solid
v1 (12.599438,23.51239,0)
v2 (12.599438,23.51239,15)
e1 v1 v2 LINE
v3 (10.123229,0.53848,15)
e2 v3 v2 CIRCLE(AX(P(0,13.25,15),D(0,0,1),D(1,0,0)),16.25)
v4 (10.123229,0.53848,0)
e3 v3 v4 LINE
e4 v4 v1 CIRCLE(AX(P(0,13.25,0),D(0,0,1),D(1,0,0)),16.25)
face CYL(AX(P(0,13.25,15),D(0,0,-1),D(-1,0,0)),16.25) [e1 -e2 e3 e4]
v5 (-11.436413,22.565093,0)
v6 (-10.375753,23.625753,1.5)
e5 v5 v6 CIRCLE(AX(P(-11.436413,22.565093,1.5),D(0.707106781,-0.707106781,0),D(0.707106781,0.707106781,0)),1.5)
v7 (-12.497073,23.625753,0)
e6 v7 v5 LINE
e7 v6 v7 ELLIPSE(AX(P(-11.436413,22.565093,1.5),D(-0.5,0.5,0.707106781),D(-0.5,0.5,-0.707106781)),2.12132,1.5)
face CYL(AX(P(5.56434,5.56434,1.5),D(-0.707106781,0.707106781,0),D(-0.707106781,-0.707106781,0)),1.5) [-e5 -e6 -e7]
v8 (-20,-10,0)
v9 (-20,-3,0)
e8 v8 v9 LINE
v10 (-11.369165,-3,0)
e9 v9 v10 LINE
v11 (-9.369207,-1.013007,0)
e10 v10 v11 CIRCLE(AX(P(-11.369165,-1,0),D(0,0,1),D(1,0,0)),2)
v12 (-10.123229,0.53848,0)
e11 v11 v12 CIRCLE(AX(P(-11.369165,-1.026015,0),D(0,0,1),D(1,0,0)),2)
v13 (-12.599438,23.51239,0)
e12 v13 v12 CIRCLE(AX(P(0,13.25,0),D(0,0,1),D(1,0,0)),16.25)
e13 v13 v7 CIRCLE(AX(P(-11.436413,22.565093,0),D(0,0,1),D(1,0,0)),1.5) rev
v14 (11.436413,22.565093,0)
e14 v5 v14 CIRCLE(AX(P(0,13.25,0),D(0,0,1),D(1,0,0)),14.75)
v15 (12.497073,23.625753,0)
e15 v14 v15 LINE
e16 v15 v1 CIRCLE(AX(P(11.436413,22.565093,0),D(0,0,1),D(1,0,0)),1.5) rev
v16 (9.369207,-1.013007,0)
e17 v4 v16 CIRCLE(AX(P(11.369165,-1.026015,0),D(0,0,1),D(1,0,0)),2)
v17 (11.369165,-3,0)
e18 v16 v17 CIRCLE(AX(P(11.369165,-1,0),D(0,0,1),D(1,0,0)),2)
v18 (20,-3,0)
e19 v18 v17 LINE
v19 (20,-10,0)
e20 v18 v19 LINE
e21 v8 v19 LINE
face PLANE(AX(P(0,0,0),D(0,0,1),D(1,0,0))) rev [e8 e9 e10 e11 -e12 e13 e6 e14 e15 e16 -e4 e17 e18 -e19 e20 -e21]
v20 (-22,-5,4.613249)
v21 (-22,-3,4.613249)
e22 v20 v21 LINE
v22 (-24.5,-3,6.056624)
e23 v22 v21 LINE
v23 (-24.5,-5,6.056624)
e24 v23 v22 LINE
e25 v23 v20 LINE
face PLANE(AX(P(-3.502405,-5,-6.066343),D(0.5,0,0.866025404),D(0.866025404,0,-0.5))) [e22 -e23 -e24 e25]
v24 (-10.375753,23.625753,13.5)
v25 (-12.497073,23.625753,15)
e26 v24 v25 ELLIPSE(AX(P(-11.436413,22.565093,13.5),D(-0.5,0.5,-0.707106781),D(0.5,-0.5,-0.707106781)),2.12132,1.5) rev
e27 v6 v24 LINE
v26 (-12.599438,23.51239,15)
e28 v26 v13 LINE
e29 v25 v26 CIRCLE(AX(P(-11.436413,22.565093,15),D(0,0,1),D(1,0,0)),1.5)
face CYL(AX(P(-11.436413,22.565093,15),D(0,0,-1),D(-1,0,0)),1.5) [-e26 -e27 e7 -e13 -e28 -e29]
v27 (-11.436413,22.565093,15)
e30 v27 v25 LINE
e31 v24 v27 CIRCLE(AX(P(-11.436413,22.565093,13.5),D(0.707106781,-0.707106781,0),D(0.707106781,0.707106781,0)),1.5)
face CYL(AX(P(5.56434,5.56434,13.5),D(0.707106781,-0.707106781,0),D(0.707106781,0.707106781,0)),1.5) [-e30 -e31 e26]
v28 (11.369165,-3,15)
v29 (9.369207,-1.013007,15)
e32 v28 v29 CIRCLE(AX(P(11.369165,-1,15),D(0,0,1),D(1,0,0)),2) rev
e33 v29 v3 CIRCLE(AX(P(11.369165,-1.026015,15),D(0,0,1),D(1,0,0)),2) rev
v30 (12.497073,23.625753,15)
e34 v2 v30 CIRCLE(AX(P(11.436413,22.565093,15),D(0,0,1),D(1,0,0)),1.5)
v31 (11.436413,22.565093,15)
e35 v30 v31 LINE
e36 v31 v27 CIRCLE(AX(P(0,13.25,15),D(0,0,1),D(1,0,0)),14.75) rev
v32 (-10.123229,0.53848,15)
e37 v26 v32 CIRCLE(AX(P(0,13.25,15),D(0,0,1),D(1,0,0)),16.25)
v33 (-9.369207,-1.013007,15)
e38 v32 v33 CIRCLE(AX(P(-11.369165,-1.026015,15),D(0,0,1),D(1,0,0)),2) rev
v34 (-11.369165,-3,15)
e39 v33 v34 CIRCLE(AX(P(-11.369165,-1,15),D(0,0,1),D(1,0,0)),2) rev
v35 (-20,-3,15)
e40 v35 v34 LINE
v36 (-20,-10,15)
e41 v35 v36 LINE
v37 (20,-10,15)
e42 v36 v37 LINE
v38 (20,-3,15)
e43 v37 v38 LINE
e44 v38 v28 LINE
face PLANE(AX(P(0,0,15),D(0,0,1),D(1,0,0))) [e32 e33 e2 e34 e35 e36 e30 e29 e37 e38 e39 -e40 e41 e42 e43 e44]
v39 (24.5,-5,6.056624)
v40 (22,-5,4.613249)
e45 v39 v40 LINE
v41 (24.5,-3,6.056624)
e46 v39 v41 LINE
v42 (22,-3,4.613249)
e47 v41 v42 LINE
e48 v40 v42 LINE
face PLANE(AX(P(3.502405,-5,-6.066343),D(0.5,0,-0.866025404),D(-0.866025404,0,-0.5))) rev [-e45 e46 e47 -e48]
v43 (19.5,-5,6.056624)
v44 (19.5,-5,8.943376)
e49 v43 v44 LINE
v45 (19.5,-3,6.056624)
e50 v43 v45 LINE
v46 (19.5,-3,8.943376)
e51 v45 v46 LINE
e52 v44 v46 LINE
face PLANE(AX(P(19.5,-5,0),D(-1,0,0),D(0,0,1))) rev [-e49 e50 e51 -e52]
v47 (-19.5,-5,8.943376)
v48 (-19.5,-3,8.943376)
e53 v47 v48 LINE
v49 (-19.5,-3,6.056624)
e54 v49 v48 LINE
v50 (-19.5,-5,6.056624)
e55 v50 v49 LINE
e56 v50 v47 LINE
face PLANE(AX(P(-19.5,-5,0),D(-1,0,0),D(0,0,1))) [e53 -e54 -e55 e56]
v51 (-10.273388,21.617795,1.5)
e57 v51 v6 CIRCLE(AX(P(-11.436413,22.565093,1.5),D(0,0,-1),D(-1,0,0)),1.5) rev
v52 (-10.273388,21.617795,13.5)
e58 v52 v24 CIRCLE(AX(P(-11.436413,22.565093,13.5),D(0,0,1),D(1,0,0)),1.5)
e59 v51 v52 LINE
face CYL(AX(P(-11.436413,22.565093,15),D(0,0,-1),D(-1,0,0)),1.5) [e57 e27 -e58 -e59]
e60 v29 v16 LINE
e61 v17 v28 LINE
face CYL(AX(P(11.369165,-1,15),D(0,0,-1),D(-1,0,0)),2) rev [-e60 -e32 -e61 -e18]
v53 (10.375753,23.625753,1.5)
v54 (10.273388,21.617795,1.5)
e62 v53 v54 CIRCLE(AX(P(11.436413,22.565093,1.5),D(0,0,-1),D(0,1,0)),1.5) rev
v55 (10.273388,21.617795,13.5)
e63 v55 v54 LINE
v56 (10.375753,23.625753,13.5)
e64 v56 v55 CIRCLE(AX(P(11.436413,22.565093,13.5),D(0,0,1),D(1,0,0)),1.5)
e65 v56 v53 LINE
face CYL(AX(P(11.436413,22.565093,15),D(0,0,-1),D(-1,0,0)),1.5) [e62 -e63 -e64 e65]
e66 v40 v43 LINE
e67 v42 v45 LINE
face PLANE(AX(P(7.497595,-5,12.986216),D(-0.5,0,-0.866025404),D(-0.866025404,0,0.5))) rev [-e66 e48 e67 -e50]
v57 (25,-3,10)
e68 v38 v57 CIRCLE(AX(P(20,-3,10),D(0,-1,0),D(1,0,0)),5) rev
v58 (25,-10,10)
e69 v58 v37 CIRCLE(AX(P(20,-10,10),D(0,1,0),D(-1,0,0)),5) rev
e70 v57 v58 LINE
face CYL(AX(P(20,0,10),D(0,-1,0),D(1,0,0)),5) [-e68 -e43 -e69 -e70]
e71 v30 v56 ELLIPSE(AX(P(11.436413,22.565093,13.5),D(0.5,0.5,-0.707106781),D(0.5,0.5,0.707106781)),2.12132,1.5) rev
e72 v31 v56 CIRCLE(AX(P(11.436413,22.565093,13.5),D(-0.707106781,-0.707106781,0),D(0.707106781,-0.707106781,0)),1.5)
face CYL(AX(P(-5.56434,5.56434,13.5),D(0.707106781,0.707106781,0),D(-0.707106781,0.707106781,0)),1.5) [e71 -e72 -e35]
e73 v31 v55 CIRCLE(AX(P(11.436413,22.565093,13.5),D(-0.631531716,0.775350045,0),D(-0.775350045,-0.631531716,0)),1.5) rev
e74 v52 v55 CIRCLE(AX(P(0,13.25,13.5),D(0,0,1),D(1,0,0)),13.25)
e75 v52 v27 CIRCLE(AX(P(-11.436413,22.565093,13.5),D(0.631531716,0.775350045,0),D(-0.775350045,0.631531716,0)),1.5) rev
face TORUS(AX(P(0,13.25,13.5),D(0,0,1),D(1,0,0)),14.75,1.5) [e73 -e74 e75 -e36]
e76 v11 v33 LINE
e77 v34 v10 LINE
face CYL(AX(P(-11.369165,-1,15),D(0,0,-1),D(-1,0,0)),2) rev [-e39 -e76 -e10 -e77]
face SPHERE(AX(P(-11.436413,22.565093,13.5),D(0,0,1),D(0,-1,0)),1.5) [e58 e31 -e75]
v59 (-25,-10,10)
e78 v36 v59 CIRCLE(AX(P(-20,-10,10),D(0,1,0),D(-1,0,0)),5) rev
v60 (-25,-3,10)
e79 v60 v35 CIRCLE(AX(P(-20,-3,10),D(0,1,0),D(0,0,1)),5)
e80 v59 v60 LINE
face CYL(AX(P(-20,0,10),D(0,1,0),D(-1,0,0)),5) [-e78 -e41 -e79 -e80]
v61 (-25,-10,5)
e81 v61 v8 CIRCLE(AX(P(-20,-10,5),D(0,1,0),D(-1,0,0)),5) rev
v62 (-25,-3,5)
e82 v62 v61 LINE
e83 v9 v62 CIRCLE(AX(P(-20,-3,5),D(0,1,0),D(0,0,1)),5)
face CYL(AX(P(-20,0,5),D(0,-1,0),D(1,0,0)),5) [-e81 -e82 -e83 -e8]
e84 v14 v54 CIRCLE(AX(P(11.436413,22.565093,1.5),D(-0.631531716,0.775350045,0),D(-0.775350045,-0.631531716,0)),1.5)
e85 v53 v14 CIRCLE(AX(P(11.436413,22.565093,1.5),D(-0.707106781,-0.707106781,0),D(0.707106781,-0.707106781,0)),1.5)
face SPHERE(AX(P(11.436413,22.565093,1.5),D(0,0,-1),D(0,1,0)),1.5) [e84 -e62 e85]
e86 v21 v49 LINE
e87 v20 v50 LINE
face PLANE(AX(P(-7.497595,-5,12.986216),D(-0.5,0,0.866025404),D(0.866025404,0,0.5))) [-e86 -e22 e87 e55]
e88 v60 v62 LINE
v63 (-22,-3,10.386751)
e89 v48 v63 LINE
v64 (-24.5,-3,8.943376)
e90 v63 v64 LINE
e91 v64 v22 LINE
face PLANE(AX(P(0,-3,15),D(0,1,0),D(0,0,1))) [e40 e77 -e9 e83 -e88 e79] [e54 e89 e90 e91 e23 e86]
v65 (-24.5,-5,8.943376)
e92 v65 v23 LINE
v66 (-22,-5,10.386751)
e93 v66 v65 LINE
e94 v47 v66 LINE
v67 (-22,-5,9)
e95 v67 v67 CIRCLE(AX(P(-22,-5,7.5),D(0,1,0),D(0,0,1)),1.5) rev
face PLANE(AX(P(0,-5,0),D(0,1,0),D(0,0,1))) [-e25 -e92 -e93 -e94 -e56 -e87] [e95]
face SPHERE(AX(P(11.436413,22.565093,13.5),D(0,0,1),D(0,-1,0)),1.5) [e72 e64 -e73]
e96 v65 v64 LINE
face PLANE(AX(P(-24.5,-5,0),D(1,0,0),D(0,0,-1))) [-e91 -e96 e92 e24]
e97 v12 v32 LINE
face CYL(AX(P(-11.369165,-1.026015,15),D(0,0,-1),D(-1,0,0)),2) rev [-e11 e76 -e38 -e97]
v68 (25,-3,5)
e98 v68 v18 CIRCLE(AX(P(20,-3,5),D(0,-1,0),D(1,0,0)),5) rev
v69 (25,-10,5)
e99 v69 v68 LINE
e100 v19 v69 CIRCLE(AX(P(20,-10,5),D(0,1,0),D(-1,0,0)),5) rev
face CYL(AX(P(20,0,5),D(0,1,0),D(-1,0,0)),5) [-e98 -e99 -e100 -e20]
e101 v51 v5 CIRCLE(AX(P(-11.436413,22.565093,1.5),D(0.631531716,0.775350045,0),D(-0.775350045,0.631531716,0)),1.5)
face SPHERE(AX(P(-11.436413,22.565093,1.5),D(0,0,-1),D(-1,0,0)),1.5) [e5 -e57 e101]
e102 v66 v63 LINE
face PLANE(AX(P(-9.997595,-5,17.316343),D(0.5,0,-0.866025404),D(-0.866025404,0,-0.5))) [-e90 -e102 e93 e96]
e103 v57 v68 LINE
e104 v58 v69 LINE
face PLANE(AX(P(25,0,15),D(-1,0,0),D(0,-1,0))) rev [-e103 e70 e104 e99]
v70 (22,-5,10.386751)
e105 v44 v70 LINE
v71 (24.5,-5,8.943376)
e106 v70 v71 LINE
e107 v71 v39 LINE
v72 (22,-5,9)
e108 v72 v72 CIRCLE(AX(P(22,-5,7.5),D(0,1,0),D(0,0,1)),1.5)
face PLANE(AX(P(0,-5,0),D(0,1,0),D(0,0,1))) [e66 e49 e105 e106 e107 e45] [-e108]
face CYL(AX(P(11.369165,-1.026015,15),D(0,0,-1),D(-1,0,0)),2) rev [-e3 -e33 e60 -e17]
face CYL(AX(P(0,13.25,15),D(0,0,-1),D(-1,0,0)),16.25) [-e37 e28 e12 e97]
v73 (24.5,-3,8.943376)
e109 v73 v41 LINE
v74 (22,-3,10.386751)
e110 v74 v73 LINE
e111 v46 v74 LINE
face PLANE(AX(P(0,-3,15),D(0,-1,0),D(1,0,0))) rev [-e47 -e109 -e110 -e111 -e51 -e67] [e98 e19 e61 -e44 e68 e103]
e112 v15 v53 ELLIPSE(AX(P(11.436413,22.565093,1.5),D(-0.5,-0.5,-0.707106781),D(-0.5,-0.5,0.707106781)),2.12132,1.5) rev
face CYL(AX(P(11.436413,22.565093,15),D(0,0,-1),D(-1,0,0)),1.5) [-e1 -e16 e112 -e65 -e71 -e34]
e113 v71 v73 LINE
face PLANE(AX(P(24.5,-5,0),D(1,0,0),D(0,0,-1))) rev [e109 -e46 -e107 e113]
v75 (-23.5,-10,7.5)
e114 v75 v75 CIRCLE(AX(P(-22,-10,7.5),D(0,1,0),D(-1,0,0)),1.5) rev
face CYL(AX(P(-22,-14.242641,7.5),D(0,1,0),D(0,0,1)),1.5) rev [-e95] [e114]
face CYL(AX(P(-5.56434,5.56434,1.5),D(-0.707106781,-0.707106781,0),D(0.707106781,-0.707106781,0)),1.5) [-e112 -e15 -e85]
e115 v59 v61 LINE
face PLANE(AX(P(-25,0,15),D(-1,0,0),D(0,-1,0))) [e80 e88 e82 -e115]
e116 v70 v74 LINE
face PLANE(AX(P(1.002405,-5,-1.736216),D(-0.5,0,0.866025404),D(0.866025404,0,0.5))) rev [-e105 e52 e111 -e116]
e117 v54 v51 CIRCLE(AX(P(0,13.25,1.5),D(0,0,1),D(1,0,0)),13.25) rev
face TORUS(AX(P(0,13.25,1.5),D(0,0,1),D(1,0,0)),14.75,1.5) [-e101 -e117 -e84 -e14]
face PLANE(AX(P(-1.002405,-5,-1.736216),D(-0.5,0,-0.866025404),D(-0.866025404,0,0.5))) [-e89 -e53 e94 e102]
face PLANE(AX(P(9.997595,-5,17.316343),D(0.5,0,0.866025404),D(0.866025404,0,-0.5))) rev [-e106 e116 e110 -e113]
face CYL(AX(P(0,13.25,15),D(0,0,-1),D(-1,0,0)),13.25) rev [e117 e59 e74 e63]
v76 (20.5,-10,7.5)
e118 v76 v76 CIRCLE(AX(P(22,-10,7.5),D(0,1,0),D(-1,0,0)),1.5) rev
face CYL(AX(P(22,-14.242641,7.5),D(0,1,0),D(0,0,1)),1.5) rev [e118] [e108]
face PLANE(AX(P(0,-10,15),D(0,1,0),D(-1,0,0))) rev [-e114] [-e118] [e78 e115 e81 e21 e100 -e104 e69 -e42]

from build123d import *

# Parameters (mm, degrees)
RESSALTO_EXTRUS_O1_DEPTH = 15
ESBO_O3_R                = 1.5
CORTE_EXTRUS_O1_DEPTH    = 7
CORTE_EXTRUS_O2_DEPTH    = 2
FILETE1_R                = 1.5
FILETE2_R                = 2
FILETE3_R                = 5


# Some blends are built 0.0001 mm under size
with BuildPart() as part:
    # Esboço2 → Ressalto-extrusão1 (new body)
    with BuildSketch(Plane.XY):
        with BuildLine():
            Line((-25, -3), (-25, -10))
            Line((-25, -10), (25, -10))
            Line((25, -10), (25, -3))
            Line((25, -3), (9.369164851, -3))
            Line((9.369164851, -3), (9.369164851, -0.027094938))
            ThreePointArc((9.369164851, -0.027094938), (16.19072285, 11.863279554), (11.490485194, 24.740485194))
            Line((11.490485194, 24.740485194), (9.369164851, 22.619164851))
            ThreePointArc((9.369164851, 22.619164851), (0, 0), (-9.369164851, 22.619164851))
            Line((-9.369164851, 22.619164851), (-11.490485194, 24.740485194))
            ThreePointArc((-11.490485194, 24.740485194), (-16.19072285, 11.863279554), (-9.369164851, -0.027094938))
            Line((-9.369164851, -0.027094938), (-9.369164851, -3))
            Line((-9.369164851, -3), (-25, -3))
        make_face()
    extrude(amount=RESSALTO_EXTRUS_O1_DEPTH)

    # Esboço3 → Corte-extrusão1 (cut)
    with BuildSketch(Plane(origin=(0, -3, 0), x_dir=(1, 0, 0), z_dir=(0, 1, 0))):
        with Locations(Location((22, -7.5, 0), (0, 0, 270))):
            Circle(ESBO_O3_R)
        with Locations(Location((-22, -7.5, 0), (0, 0, 180))):
            Circle(ESBO_O3_R)
    extrude(amount=-CORTE_EXTRUS_O1_DEPTH, mode=Mode.SUBTRACT)

    # Esboço5 → Corte-extrusão2 (cut)
    with BuildSketch(Plane(origin=(0, -3, 0), x_dir=(1, 0, 0), z_dir=(0, 1, 0))):
        Polygon((22, -4.613248654), (19.5, -6.056624327), (19.5, -8.943375673), (22, -10.386751346), (24.5, -8.943375673), (24.5, -6.056624327), align=None)
        Polygon((-24.5, -6.056624327), (-22, -4.613248654), (-19.5, -6.056624327), (-19.5, -8.943375673), (-22, -10.386751346), (-24.5, -8.943375673), align=None)
    extrude(amount=-CORTE_EXTRUS_O2_DEPTH, mode=Mode.SUBTRACT)

    # Filete1
    filete1_edges = [part.edges().sort_by_distance(p)[0] for p in [
        (10.429825023, 23.679825023, 15),
        (-10.429825023, 23.679825023, 0),
        (0, 0, 0),
        (10.429825023, 23.679825023, 0),
        (0, 0, 15),
        (-11.490485194, 24.740485194, 7.5),
        (-9.369164851, 22.619164851, 7.5),
        (9.369164851, 22.619164851, 7.5),
        (11.490485194, 24.740485194, 7.5),
        (-10.429825023, 23.679825023, 15),
    ]]
    fillet(filete1_edges, radius=FILETE1_R - 0.0001)  # a hair under: the kernel refuses the full size

    # Filete2
    # the kernel refuses this fillet: 2 mm, written as the material it adds along each edge
    with BuildSketch(Plane(origin=(9.369164851, -0.027094938, 0), x_dir=(0.7999862174060132, 0.600018376352274, 0), z_dir=(0, 0, 1))) as filete2_piece_1:
        with BuildLine():
            CenterArc((1.000602329, -1.999158651), FILETE2_R, 91.661980606, 51.466805628)
            Line((-0.599370106, -0.799121898), (0, 0))
            ThreePointArc((0, 0), (0.471298198, -0.006835961), (0.942596397, 0))
        make_face()
    extrude(amount=15)
    with BuildSketch(Plane(origin=(9.369164851, -3, 0), x_dir=(0, 1, 0), z_dir=(0, 0, 1)), Plane(origin=(-9.369164851, -3, 0), x_dir=(-1, 0, 0), z_dir=(0, 0, 1))) as filete2_piece_2:
        with BuildLine():
            CenterArc((FILETE2_R, -FILETE2_R), FILETE2_R, 90, 90)
            Line((0, -FILETE2_R), (0, 0))
            Line((0, 0), (FILETE2_R, 0))
        make_face()
    extrude(amount=15)
    with BuildSketch(Plane(origin=(-9.369164851, -0.027094938, 0), x_dir=(-0.799986217406012, 0.6000183763522756, 0), z_dir=(0, 0, 1))) as filete2_piece_3:
        with BuildLine():
            CenterArc((1.000602329, 1.999158651), FILETE2_R, 216.871213766, 51.466805628)
            Line((-0.599370106, 0.799121898), (0, 0))
            ThreePointArc((0, 0), (0.471298198, 0.006835961), (0.942596397, 0))
        make_face()
    extrude(amount=15)

    # Filete3
    filete3_edges = [part.edges().sort_by_distance(p)[0] for p in [
        (25, -6.5, 0),
        (-25, -6.5, 0),
        (-25, -6.5, 15),
        (25, -6.5, 15),
    ]]
    fillet(filete3_edges, radius=FILETE3_R)


solid = part.part
